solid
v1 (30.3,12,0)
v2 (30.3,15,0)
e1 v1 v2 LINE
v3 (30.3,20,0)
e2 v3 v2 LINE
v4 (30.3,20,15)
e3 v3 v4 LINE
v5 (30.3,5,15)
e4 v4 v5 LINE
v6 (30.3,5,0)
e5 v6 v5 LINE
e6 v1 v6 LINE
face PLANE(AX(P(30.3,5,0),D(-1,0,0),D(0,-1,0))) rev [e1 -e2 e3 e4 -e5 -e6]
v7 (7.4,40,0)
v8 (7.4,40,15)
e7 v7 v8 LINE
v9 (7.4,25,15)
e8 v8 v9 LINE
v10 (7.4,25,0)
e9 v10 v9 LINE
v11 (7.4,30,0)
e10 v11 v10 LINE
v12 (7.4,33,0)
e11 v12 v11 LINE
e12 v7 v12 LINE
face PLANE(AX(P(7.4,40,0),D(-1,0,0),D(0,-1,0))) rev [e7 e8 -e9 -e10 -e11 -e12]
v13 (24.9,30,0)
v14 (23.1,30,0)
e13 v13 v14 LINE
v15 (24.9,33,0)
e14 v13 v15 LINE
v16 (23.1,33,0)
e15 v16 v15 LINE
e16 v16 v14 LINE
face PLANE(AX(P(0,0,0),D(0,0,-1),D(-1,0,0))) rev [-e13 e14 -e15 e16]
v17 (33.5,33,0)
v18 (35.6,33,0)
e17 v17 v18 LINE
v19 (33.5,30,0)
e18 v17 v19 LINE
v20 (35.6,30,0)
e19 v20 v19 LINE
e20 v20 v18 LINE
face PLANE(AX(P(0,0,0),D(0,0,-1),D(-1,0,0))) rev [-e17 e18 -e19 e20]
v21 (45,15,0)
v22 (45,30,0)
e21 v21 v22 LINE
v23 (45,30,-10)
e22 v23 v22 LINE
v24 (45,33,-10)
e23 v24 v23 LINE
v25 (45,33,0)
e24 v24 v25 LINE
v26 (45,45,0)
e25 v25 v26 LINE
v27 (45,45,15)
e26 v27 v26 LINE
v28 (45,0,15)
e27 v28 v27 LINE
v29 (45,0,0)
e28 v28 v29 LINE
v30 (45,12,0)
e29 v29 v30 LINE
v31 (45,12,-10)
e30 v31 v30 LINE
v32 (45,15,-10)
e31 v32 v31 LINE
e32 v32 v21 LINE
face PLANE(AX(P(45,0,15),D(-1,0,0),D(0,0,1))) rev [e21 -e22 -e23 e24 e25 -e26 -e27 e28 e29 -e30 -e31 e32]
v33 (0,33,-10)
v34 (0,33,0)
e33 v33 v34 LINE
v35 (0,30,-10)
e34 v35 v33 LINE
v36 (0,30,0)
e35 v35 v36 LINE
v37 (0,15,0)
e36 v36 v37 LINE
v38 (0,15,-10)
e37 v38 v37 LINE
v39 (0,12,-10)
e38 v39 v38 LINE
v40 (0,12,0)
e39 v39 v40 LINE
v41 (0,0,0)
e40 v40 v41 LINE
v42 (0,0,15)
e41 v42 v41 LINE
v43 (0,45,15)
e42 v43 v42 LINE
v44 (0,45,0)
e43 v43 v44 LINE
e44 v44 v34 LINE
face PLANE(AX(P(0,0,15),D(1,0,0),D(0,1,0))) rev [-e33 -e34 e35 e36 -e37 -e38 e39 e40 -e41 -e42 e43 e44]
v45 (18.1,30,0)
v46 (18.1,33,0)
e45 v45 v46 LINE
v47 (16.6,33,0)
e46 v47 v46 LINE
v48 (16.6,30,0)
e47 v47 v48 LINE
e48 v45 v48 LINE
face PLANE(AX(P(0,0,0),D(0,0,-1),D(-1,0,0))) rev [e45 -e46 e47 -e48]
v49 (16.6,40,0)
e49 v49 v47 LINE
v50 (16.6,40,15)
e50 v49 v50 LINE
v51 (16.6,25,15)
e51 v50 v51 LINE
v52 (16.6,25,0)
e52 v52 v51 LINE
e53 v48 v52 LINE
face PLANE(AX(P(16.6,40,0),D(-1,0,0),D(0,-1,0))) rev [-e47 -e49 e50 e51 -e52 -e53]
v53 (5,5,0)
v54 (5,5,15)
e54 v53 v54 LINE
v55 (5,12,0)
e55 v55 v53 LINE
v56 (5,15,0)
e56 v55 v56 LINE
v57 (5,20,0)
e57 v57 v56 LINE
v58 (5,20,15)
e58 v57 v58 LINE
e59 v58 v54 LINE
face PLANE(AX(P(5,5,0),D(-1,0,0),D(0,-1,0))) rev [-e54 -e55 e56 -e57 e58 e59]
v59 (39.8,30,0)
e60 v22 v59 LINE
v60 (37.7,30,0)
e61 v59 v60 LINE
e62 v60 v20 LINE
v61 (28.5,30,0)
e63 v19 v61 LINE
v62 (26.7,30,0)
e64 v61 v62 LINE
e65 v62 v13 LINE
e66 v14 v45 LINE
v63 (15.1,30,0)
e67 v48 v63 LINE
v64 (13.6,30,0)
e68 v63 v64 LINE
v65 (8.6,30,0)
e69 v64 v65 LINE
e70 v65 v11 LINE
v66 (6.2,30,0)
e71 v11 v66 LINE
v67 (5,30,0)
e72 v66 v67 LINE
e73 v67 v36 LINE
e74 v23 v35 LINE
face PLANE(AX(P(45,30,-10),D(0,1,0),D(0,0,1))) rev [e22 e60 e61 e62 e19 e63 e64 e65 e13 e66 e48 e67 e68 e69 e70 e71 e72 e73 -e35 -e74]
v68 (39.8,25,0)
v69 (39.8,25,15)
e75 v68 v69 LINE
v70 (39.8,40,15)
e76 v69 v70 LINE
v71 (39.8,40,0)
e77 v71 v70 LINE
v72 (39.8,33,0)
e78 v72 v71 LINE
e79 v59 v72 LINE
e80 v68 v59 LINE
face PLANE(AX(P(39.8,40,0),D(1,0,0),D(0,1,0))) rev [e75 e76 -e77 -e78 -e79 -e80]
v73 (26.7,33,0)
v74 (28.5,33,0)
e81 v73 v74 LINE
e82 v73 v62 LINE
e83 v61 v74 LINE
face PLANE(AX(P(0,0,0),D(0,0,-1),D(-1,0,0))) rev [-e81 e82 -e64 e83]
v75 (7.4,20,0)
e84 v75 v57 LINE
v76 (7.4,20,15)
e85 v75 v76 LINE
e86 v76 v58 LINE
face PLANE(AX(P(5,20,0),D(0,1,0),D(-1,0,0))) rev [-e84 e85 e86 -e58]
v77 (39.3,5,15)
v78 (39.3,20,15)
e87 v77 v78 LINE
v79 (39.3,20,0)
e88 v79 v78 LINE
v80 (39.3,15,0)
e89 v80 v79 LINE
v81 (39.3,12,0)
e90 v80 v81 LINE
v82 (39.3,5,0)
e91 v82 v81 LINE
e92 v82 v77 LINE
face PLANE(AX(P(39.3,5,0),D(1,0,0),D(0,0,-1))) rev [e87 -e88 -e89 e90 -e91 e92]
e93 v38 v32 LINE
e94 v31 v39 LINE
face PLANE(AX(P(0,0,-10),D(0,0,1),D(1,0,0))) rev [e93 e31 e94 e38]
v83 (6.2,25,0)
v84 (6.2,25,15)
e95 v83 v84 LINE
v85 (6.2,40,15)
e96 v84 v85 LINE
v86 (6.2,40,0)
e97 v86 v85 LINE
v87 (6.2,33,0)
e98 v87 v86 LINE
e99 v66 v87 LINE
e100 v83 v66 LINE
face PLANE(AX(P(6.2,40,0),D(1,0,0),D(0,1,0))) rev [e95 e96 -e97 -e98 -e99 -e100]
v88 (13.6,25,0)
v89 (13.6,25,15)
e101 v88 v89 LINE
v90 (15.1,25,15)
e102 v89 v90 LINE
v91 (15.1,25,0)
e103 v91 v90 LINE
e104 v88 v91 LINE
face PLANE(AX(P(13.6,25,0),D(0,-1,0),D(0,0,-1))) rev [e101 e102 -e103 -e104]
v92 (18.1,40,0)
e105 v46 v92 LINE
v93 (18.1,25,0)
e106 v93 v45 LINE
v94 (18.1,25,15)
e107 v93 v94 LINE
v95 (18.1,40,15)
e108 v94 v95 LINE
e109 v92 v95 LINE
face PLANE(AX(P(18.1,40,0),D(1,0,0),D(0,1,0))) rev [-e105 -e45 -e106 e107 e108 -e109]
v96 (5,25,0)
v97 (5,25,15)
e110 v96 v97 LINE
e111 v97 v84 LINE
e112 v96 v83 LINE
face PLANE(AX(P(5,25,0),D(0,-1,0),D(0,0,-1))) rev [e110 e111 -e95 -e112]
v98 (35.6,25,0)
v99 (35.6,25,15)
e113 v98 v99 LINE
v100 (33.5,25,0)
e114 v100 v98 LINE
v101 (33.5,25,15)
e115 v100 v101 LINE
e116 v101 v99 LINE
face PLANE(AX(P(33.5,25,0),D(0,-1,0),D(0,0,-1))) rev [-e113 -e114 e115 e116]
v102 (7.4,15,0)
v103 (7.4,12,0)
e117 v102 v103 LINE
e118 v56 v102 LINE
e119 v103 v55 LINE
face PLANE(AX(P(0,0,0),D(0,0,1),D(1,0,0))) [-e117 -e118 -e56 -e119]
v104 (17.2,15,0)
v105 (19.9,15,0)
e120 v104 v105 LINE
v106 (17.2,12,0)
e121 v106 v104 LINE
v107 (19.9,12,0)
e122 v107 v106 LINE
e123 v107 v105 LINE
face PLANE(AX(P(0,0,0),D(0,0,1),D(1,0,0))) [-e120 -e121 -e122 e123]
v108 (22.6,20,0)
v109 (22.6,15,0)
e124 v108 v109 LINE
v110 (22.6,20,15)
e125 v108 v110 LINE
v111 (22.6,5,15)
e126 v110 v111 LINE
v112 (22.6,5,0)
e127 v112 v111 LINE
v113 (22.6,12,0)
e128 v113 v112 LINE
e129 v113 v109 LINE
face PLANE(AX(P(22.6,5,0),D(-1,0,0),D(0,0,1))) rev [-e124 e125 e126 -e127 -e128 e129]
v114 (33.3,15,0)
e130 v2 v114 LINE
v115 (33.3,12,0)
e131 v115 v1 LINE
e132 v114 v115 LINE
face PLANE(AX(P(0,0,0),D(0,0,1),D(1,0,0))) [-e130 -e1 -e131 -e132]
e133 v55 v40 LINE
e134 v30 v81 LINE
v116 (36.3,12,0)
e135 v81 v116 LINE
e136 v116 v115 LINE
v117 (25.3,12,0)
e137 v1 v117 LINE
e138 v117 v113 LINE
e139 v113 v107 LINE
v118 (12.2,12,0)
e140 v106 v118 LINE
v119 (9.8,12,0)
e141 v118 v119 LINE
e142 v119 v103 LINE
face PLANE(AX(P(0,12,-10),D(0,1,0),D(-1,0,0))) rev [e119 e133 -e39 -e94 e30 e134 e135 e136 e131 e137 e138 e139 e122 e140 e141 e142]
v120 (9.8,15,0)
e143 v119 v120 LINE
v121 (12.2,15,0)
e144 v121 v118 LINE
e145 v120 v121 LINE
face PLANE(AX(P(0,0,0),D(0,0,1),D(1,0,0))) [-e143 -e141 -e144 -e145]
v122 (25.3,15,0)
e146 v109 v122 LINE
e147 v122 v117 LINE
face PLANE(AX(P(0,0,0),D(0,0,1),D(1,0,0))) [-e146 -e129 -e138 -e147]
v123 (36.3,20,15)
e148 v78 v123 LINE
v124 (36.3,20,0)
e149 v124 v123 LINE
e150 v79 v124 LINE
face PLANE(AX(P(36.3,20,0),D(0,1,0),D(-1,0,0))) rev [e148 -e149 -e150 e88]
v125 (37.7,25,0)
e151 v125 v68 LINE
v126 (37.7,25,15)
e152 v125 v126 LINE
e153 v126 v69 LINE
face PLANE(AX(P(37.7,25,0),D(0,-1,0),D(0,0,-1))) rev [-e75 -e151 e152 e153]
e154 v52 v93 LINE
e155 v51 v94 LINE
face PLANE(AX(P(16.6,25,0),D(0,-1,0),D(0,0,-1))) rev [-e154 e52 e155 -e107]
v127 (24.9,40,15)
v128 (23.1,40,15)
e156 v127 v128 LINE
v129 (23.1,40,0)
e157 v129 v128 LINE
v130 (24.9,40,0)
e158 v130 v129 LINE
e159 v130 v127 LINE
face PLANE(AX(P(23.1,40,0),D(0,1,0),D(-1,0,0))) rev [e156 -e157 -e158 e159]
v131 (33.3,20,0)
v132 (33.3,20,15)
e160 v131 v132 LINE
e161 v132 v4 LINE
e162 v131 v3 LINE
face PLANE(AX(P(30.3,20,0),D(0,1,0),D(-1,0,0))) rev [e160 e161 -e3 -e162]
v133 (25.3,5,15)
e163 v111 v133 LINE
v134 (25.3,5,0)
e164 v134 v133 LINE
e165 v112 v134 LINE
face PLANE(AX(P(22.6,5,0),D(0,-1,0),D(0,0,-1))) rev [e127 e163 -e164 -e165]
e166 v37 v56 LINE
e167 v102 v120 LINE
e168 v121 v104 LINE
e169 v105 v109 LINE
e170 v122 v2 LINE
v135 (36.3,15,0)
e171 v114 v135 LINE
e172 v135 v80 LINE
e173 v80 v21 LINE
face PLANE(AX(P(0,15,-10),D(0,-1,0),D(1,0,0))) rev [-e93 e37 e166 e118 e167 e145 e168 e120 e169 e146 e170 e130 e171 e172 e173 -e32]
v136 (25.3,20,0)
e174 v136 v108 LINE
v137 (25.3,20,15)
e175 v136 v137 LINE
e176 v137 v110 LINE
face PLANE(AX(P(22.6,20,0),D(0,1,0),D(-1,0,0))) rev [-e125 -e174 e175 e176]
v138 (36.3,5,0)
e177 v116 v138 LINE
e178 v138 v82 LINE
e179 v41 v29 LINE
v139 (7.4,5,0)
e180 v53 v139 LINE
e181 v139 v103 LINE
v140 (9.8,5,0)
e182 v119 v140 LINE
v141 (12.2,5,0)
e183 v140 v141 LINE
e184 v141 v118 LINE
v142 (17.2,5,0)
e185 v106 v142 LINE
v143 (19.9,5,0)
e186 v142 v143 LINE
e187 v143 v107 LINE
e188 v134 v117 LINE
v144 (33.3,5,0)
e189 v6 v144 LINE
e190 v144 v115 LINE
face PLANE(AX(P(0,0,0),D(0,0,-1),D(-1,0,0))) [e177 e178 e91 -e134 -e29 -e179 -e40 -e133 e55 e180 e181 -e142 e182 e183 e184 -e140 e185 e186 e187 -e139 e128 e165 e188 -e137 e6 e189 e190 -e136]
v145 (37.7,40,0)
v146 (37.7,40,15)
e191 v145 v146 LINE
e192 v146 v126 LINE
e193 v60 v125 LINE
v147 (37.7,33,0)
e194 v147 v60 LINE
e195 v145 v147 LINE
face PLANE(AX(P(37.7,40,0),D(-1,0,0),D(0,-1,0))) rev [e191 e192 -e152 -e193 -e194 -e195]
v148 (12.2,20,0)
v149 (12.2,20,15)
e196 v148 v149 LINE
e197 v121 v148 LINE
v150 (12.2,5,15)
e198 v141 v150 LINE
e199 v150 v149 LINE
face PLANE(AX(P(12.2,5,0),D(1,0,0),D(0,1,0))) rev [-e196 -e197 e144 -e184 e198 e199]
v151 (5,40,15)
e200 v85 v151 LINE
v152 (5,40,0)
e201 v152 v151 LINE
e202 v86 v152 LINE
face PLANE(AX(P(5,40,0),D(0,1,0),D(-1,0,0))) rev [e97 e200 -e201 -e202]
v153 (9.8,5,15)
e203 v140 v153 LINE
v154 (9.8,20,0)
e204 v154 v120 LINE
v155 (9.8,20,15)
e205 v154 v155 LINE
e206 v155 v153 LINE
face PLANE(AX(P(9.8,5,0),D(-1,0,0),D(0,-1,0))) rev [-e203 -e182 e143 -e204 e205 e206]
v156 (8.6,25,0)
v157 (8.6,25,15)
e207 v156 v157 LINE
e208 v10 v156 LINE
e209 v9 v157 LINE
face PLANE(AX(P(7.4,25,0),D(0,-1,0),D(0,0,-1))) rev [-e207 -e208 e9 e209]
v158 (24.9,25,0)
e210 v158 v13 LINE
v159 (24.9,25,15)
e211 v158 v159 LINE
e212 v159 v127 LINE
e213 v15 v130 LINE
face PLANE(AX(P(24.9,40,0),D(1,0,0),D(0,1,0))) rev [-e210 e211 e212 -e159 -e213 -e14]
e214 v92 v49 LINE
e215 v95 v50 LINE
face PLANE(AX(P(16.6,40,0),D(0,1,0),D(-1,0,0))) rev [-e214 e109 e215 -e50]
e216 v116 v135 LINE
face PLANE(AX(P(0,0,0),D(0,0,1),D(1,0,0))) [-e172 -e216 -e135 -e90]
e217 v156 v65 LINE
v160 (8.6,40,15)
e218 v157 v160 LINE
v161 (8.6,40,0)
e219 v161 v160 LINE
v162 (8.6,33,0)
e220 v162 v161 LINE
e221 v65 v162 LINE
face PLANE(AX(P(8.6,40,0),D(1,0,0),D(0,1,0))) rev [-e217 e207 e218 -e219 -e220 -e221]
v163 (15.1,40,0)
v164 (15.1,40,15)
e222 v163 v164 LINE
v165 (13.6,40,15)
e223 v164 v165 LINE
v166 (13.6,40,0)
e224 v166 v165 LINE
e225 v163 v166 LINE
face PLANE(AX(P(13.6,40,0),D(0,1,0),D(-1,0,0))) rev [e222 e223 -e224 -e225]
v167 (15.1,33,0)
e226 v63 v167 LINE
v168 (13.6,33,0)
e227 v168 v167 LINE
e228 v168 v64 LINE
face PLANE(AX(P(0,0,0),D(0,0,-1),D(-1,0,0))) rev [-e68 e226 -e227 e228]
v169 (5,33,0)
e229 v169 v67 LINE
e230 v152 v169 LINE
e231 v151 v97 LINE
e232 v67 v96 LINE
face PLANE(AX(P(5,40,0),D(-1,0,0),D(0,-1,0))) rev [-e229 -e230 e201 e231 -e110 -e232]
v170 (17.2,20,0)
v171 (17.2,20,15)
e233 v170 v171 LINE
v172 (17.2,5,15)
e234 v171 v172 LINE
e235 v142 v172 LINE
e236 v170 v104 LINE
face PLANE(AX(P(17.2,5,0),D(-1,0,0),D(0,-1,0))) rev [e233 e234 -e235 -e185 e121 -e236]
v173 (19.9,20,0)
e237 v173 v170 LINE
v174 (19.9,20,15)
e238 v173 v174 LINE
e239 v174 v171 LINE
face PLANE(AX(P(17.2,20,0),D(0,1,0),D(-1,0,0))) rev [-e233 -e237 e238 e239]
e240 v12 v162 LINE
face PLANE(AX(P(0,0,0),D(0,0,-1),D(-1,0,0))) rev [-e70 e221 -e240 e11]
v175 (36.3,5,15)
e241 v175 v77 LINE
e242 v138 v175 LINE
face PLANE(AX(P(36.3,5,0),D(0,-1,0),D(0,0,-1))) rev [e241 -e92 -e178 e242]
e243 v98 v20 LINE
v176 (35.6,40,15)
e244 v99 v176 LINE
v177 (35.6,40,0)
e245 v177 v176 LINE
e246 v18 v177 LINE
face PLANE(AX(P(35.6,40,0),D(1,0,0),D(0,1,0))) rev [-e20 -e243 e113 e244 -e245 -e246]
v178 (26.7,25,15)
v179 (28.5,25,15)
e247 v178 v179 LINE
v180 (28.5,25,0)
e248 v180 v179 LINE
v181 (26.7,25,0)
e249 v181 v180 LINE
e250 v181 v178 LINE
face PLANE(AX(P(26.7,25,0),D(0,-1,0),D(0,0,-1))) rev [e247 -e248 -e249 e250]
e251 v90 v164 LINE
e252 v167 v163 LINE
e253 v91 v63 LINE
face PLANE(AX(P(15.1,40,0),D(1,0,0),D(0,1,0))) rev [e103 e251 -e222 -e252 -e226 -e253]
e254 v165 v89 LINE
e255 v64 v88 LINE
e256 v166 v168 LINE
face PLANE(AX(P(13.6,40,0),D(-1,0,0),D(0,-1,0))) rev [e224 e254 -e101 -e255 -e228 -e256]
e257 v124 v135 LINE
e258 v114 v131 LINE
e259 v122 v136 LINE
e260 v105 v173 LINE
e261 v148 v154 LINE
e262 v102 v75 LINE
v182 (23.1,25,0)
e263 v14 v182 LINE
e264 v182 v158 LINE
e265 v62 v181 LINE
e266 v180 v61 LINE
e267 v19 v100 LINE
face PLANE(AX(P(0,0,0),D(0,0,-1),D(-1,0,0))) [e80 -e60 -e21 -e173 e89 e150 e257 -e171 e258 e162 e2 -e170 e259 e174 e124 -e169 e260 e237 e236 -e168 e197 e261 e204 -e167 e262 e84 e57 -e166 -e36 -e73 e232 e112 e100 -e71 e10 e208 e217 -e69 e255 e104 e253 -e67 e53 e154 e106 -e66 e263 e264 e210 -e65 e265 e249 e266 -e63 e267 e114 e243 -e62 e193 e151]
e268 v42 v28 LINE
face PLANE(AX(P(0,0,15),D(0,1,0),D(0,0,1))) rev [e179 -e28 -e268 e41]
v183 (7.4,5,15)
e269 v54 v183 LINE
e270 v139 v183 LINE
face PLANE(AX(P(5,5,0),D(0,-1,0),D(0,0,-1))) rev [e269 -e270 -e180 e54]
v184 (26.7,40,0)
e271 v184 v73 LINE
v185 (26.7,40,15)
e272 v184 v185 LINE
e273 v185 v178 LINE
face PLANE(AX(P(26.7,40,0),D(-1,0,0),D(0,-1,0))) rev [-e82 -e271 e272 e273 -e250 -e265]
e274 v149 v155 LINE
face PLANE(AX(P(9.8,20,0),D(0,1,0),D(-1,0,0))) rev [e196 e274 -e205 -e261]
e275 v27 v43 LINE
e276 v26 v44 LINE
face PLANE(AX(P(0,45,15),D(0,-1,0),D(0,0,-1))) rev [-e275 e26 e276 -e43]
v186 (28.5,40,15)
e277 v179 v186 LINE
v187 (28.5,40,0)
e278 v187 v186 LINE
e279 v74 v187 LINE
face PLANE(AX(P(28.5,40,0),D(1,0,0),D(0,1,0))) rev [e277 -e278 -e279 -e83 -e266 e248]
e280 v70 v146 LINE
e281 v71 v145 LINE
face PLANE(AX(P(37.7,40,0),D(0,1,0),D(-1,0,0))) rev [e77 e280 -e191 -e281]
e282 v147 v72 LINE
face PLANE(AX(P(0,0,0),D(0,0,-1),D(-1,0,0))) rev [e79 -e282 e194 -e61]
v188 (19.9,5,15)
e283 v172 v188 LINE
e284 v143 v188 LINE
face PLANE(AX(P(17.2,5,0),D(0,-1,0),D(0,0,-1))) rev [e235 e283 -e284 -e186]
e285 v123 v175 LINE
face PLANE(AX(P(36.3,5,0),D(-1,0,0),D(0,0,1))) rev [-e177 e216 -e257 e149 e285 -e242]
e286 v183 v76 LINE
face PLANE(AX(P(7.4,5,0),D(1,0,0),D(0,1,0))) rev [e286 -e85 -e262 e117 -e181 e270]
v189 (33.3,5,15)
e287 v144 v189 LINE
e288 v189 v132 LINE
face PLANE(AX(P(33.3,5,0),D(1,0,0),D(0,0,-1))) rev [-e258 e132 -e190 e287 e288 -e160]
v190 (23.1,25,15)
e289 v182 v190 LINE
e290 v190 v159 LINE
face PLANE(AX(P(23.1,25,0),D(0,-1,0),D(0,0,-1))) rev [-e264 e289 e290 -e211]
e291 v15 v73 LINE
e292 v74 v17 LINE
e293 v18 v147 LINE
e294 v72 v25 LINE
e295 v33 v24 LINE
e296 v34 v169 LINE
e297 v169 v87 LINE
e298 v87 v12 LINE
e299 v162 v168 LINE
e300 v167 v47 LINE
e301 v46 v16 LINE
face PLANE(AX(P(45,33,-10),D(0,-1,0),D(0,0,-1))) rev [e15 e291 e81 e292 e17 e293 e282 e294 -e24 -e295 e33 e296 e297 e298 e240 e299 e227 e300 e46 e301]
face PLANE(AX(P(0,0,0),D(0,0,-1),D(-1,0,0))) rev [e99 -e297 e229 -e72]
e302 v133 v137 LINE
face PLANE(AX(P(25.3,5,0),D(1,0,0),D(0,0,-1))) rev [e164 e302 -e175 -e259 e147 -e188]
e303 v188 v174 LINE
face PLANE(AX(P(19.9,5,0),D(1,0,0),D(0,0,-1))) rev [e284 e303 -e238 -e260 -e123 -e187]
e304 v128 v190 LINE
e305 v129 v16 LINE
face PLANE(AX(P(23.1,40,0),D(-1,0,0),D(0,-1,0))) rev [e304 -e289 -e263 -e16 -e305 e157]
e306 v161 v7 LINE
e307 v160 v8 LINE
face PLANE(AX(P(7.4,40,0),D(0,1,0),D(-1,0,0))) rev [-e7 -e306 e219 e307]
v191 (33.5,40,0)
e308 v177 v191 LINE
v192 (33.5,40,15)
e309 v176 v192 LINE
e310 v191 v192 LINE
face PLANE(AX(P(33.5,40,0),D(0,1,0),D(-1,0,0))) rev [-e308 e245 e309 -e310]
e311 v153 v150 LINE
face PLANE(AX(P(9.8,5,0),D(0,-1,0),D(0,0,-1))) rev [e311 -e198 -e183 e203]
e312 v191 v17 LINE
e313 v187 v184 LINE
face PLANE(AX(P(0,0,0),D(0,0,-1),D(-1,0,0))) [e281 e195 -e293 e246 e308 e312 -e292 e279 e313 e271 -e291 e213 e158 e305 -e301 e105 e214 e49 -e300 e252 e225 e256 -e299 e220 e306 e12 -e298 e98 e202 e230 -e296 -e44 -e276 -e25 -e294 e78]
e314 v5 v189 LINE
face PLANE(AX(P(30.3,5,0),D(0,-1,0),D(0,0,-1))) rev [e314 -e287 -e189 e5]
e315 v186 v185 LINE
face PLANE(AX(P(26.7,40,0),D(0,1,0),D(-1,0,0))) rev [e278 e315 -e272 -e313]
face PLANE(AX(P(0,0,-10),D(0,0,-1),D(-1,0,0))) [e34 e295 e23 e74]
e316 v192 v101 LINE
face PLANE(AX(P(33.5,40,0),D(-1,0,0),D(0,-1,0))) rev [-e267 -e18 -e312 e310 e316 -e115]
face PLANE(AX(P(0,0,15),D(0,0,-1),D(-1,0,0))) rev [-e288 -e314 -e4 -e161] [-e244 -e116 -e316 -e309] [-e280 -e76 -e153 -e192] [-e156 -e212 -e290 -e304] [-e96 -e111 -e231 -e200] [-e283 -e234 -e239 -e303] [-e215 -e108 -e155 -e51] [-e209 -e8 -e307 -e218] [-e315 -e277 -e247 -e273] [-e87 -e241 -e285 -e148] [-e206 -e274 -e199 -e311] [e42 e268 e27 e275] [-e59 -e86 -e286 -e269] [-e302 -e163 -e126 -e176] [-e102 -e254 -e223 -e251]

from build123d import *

# Parameters (mm, degrees)
BASE_W            = 45
BASE_H            = 45
BLOCK_DEPTH       = 15
SKETCH5_W         = 1.2
SKETCH5_H         = 15
ROW_1_SEED_DEPTH  = 66.383484153
ROW_1_START       = 25
ROW_1_OUTLINE_W   = 2.1
ROW_1_OUTLINE_H   = 15
ROW_1_OUTLINE_W_2 = 1.8
ROW_1_OUTLINE_W_3 = 1.5
ROW_1_DEPTH       = 15
SKETCH6_W         = 2.4
SKETCH6_H         = 15
ROW_2_SEED_DEPTH  = 66.383484153
ROW_2_START       = 5
ROW_2_OUTLINE_W   = 3
ROW_2_OUTLINE_H   = 15
ROW_2_OUTLINE_W_2 = 2.7
ROW_2_DEPTH       = 15
SKETCH8_W         = 45
SKETCH8_H         = 3
ADAPTER_DEPTH     = 10


# Read off the part's stored shape, not the designer's step: row-1, row-2
with BuildPart() as part:
    # base → block (new body)
    with BuildSketch(Plane.XY):
        with Locations((22.5, 22.5)):
            Rectangle(BASE_W, BASE_H)
    extrude(amount=BLOCK_DEPTH)

    # Sketch5 → row-1-seed (cut, through all)
    with BuildSketch(Plane.XY.offset(15)):
        with Locations((5.6, 32.5)):
            Rectangle(SKETCH5_W, SKETCH5_H)
        with Locations((8, 32.5)):
            Rectangle(SKETCH5_W, SKETCH5_H)
    extrude(amount=-ROW_1_SEED_DEPTH, mode=Mode.SUBTRACT)

    # row-1 outline → row-1 (cut)
    with BuildSketch(Plane(origin=(0, 0, 0), x_dir=(1, 0, 0), z_dir=(0, 1, 0)).offset(ROW_1_START)):
        with Locations((38.75, -7.5)):
            Rectangle(ROW_1_OUTLINE_W, ROW_1_OUTLINE_H)
        with Locations((34.55, -7.5)):
            Rectangle(ROW_1_OUTLINE_W, ROW_1_OUTLINE_H)
        with Locations((27.6, -7.5)):
            Rectangle(ROW_1_OUTLINE_W_2, ROW_1_OUTLINE_H)
        with Locations((24, -7.5)):
            Rectangle(ROW_1_OUTLINE_W_2, ROW_1_OUTLINE_H)
        with Locations((17.35, -7.5)):
            Rectangle(ROW_1_OUTLINE_W_3, ROW_1_OUTLINE_H)
        with Locations((14.35, -7.5)):
            Rectangle(ROW_1_OUTLINE_W_3, ROW_1_OUTLINE_H)
    extrude(amount=ROW_1_DEPTH, mode=Mode.SUBTRACT)

    # Sketch6 → row-2-seed (cut, through all)
    with BuildSketch(Plane.XY.offset(15)):
        with Locations((6.2, 12.5)):
            Rectangle(SKETCH6_W, SKETCH6_H)
        with Locations((11, 12.5)):
            Rectangle(SKETCH6_W, SKETCH6_H)
    extrude(amount=-ROW_2_SEED_DEPTH, mode=Mode.SUBTRACT)

    # row-2 outline → row-2 (cut)
    with BuildSketch(Plane(origin=(0, 0, 0), x_dir=(1, 0, 0), z_dir=(0, 1, 0)).offset(ROW_2_START)):
        with Locations((37.8, -7.5)):
            Rectangle(ROW_2_OUTLINE_W, ROW_2_OUTLINE_H)
        with Locations((31.8, -7.5)):
            Rectangle(ROW_2_OUTLINE_W, ROW_2_OUTLINE_H)
        with Locations((23.95, -7.5)):
            Rectangle(ROW_2_OUTLINE_W_2, ROW_2_OUTLINE_H)
        with Locations((18.55, -7.5)):
            Rectangle(ROW_2_OUTLINE_W_2, ROW_2_OUTLINE_H)
    extrude(amount=ROW_2_DEPTH, mode=Mode.SUBTRACT)

    # Sketch8 → adapter (add)
    with BuildSketch(Plane(origin=(0, 0, 0), x_dir=(-1, 0, 0), z_dir=(0, 0, -1))):
        with Locations((-22.5, 31.5)):
            Rectangle(SKETCH8_W, SKETCH8_H)
        with Locations((-22.5, 13.5)):
            Rectangle(SKETCH8_W, SKETCH8_H)
    extrude(amount=ADAPTER_DEPTH)


solid = part.part
